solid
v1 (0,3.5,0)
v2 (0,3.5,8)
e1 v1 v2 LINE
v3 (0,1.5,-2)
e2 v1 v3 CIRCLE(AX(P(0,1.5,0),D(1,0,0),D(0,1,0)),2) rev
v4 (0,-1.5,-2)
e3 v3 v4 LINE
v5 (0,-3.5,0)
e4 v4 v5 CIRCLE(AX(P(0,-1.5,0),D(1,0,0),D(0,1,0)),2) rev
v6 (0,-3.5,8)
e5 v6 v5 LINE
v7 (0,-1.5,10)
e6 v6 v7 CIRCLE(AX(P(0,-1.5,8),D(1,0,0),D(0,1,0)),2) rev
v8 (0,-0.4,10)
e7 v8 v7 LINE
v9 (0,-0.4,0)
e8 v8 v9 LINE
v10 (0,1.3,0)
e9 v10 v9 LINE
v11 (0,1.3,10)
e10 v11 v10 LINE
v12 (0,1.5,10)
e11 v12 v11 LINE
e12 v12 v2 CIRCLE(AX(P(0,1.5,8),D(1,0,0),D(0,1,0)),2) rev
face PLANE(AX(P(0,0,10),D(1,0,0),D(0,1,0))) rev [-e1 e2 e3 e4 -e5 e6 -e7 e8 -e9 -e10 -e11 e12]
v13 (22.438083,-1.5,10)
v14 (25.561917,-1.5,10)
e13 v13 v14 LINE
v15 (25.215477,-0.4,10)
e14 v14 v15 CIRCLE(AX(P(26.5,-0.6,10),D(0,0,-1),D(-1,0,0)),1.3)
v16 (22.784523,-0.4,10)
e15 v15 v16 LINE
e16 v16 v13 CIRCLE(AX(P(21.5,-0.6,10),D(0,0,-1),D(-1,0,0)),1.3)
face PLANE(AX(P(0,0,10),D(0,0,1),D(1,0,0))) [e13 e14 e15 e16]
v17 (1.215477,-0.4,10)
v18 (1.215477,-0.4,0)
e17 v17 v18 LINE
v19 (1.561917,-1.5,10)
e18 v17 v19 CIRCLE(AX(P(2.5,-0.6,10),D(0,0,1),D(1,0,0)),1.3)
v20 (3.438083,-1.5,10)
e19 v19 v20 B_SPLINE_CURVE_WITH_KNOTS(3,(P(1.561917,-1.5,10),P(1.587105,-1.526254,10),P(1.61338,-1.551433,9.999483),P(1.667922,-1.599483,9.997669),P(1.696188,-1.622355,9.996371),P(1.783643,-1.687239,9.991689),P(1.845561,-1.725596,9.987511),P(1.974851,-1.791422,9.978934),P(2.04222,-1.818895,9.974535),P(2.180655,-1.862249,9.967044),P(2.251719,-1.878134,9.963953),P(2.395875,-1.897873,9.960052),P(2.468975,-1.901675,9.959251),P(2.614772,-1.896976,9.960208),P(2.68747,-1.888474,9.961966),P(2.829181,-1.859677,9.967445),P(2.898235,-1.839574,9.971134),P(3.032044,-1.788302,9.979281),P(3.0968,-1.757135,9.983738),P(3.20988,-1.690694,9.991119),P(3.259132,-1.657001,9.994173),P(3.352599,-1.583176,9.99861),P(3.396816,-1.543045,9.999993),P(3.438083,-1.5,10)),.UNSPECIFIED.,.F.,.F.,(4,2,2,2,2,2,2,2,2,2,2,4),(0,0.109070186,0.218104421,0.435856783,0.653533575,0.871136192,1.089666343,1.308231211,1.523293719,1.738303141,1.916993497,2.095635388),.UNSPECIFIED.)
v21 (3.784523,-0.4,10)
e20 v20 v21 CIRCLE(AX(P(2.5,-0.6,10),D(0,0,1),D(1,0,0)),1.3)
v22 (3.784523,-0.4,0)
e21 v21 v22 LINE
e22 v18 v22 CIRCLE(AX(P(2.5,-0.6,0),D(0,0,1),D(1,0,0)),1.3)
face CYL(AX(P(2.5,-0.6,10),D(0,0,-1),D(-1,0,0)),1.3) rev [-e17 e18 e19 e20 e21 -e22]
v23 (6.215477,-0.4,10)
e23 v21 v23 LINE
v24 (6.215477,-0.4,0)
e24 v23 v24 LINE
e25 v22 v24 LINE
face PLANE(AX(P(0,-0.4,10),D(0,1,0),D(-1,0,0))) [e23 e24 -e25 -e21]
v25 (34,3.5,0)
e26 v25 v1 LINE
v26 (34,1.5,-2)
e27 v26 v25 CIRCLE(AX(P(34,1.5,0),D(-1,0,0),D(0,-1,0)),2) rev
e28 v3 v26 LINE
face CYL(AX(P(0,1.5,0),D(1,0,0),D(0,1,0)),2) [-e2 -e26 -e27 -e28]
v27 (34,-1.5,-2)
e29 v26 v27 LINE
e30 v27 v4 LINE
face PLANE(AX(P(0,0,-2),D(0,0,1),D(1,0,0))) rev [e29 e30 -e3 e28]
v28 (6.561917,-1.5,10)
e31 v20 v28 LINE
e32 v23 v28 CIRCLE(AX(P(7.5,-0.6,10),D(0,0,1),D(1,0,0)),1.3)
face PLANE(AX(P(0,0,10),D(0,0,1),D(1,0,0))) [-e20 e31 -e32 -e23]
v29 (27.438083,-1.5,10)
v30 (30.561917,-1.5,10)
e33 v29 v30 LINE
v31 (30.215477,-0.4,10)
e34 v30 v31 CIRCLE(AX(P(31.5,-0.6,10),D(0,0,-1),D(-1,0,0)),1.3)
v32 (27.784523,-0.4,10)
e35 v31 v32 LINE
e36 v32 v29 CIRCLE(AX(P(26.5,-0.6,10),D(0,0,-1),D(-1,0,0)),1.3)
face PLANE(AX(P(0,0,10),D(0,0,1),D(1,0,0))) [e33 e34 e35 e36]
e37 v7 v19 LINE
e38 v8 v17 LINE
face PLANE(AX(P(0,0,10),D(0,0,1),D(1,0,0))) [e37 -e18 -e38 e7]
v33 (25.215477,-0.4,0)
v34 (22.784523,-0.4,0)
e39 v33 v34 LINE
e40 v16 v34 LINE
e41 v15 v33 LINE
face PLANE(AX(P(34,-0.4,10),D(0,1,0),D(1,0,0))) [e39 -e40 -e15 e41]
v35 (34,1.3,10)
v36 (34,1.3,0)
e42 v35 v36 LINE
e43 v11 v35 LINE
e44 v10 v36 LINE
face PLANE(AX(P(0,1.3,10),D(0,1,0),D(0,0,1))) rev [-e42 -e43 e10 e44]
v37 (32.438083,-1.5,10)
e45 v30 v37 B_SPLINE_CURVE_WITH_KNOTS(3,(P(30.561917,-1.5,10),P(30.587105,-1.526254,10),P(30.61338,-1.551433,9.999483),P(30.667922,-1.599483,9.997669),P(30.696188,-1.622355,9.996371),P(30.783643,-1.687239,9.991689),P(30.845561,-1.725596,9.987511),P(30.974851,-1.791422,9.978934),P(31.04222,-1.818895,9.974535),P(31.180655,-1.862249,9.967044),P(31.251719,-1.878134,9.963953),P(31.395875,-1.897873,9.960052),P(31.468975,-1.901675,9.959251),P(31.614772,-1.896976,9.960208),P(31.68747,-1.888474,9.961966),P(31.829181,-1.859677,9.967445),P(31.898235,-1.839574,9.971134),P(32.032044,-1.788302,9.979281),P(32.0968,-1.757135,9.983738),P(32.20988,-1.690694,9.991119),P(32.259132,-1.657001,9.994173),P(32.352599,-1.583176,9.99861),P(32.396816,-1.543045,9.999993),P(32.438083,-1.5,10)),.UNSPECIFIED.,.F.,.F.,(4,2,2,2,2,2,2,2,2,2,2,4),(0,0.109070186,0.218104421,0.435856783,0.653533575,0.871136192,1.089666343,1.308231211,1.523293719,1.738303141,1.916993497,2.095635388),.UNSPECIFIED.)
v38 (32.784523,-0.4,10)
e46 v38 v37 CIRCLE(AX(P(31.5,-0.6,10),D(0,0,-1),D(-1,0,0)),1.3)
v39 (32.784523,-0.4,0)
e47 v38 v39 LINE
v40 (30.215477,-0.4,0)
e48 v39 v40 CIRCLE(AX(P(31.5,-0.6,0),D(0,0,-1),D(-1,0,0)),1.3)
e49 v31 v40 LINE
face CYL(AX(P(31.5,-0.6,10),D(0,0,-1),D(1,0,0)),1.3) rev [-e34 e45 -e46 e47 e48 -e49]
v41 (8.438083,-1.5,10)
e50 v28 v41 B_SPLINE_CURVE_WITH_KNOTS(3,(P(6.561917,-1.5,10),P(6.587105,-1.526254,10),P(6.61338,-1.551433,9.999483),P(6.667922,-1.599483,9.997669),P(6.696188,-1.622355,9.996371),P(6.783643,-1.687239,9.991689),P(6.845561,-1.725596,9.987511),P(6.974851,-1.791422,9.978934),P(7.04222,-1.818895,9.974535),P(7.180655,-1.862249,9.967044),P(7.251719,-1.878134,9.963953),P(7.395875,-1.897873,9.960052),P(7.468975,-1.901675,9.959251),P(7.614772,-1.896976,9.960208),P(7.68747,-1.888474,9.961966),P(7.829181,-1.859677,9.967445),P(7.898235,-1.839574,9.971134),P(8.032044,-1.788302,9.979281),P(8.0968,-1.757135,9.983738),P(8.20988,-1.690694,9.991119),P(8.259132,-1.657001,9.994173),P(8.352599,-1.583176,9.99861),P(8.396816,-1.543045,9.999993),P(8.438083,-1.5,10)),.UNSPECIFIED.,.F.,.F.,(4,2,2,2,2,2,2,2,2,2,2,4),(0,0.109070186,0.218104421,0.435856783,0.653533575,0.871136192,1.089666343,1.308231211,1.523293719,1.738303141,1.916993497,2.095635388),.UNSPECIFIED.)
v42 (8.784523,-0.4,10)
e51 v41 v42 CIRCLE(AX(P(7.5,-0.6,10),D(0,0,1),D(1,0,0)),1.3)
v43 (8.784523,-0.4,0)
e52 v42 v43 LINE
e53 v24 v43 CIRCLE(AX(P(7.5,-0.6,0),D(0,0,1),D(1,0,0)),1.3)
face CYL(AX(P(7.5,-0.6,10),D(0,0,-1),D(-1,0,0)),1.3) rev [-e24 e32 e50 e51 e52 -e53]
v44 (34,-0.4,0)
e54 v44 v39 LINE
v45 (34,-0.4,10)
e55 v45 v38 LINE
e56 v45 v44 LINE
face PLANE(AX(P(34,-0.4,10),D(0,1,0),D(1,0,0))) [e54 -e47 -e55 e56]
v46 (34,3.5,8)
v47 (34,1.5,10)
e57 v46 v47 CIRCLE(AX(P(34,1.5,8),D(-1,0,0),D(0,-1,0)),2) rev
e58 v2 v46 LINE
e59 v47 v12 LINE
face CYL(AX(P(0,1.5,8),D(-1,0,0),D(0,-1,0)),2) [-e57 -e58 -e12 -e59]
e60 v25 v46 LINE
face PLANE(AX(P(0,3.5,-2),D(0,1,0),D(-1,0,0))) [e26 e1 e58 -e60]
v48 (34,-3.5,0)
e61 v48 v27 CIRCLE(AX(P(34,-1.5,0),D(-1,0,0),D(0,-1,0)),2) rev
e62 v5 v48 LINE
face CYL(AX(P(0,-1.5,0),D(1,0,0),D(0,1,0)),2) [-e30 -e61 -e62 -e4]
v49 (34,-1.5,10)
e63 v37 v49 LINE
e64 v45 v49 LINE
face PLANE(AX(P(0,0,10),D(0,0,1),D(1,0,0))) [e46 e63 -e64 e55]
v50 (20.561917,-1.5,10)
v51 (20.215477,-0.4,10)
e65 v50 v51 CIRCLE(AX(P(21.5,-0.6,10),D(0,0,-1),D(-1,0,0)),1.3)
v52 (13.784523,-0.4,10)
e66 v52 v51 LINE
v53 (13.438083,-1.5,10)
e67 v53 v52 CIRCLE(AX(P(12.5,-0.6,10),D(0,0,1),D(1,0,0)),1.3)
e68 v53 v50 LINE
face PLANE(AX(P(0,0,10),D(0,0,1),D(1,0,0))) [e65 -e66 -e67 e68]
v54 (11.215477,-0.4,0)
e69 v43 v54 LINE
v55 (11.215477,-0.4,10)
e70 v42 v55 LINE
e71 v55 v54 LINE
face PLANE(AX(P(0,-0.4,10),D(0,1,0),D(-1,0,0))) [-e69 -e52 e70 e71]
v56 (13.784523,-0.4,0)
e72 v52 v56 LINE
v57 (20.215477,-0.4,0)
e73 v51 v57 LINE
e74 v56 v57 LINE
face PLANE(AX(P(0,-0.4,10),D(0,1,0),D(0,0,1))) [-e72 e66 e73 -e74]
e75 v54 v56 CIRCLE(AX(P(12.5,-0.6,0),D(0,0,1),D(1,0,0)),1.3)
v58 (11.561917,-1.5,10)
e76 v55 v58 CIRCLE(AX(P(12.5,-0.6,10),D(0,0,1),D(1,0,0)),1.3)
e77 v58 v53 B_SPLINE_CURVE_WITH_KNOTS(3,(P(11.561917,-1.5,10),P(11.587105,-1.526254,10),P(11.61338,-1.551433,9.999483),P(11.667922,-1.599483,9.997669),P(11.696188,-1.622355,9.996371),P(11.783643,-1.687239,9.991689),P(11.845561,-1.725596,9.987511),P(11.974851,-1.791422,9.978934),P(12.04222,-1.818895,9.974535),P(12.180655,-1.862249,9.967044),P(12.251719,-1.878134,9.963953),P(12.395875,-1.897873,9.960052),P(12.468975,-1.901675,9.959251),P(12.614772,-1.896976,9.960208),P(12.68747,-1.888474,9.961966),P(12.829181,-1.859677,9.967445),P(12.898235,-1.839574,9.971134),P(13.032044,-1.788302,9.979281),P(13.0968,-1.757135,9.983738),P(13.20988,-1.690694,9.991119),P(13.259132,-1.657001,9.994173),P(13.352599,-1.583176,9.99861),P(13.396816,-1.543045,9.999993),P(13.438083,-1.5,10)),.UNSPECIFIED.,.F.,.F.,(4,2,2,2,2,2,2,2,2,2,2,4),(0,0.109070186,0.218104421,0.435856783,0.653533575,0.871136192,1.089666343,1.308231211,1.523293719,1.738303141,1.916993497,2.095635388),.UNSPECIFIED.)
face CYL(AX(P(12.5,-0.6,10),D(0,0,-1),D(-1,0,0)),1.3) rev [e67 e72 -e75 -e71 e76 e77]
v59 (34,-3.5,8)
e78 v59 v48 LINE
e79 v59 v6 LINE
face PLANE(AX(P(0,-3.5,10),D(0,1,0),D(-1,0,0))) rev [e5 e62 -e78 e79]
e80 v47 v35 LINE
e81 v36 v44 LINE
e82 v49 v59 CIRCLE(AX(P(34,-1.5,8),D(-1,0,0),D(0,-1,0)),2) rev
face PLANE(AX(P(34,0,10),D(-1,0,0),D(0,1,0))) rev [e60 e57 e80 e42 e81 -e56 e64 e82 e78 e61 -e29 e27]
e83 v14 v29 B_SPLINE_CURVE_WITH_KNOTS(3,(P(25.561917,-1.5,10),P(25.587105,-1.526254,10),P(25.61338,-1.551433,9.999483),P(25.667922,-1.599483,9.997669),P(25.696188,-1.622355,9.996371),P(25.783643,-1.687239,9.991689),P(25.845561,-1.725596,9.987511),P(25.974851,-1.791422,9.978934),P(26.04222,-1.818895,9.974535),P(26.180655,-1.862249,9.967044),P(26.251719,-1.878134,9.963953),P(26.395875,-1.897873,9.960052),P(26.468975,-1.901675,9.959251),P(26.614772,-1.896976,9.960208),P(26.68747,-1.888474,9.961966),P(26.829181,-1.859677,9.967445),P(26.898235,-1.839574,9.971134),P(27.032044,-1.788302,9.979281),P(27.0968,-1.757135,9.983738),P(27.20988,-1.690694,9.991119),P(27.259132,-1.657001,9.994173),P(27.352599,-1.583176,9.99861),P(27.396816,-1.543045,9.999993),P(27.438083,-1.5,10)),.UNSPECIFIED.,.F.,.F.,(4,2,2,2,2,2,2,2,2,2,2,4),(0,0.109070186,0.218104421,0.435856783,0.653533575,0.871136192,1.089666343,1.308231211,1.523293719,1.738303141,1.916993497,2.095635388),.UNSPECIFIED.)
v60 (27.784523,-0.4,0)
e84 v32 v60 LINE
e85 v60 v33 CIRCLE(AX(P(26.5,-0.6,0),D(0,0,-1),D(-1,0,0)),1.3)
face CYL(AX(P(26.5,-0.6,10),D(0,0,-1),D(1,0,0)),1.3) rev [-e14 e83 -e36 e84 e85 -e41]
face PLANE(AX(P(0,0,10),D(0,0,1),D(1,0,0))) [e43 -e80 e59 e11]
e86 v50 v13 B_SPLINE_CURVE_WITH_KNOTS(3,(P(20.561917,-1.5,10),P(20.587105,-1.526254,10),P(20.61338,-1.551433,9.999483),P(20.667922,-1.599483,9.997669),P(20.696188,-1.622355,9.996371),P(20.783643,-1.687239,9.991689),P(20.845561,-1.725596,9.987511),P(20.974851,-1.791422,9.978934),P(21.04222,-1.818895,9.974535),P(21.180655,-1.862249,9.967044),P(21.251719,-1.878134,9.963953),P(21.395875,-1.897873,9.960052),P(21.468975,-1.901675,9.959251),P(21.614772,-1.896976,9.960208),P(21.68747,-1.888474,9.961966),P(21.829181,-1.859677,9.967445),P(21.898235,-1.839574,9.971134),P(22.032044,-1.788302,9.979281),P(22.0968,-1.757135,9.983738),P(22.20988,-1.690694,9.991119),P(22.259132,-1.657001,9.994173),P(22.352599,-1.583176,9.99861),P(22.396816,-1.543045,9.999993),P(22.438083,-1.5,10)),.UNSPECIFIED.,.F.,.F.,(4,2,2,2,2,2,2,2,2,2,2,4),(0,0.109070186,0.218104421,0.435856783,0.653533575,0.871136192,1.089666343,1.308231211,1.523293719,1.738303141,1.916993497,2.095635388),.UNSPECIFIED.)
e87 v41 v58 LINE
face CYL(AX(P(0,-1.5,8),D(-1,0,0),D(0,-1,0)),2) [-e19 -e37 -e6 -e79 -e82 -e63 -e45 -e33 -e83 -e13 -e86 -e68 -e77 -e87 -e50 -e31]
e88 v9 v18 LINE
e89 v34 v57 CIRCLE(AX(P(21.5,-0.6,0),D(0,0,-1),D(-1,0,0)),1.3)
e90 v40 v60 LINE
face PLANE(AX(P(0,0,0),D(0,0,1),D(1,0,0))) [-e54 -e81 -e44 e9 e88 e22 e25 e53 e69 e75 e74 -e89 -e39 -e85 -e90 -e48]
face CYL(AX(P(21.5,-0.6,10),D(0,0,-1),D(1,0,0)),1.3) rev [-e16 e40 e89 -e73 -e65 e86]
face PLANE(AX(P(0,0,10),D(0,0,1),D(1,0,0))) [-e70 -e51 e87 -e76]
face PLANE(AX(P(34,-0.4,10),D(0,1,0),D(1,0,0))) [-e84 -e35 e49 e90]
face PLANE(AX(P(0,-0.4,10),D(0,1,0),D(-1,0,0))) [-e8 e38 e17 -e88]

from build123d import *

# Parameters (mm, degrees)
SKETCH2_W             = 17
SKETCH2_H             = 2.2
BOSS_EXTRUDE1_DEPTH   = 10
BOSS_EXTRUDE1_2_DEPTH = 10
SKETCH2_4_W           = 17
SKETCH2_4_H           = 7
BOSS_EXTRUDE2_DEPTH   = 2
FILLET2_R             = 2


with BuildPart() as part:
    # Sketch2 → Boss-Extrude1 (new body)
    with BuildSketch(Plane.XY):
        with Locations((8.5, 2.4)):
            Rectangle(SKETCH2_W, SKETCH2_H)
    extrude(amount=BOSS_EXTRUDE1_DEPTH)



with BuildPart() as body_2:
    # Sketch2 → Boss-Extrude1 2 (new body)
    with BuildSketch(Plane.XY):
        with BuildLine():
            Line((1.215476742, -0.4), (0, -0.4))
            Line((0, -0.4), (0, -3.5))
            Line((0, -3.5), (17, -3.5))
            Line((17, -3.5), (17, -0.4))
            Line((17, -0.4), (13.784523258, -0.4))
            ThreePointArc((13.784523258, -0.4), (12.5, -1.9), (11.215476742, -0.4))
            Line((11.215476742, -0.4), (8.784523258, -0.4))
            ThreePointArc((8.784523258, -0.4), (7.5, -1.9), (6.215476742, -0.4))
            Line((6.215476742, -0.4), (3.784523258, -0.4))
            ThreePointArc((3.784523258, -0.4), (2.5, -1.9), (1.215476742, -0.4))
        make_face()
    extrude(amount=BOSS_EXTRUDE1_2_DEPTH)


with BuildPart() as part_1:
    add(part.part)

    add(body_2.part)  # Boss-Extrude2 merges body 2
    # Sketch2<4> → Boss-Extrude2 (add)
    with BuildSketch(Plane.XY):
        with Locations((8.5, 0)):
            Rectangle(SKETCH2_4_W, SKETCH2_4_H)
    extrude(amount=-BOSS_EXTRUDE2_DEPTH)

    # Mirror1: part across plane


with BuildPart() as part_2:
    add(part_1.part)
    add(part_1.part.mirror(Plane(origin=(17, 0, 10), x_dir=(0, 0, 1), z_dir=(-1, 0, 0))))

    # Fillet2
    # the kernel refuses this fillet: 2 mm, written as the material it takes off along each edge
    with BuildSketch(Plane(origin=(-5, -3.5, 10), x_dir=(0, 0, -1), z_dir=(1, 0, 0)), Plane(origin=(-5, 3.5, -2), x_dir=(0, 0, 1), z_dir=(1, 0, 0)), Plane(origin=(-5, -3.5, -2), x_dir=(0, 1, 0), z_dir=(1, 0, 0))) as fillet2_piece_1:
        with BuildLine():
            CenterArc((FILLET2_R, FILLET2_R), FILLET2_R, 180, 90)
            Line((0, FILLET2_R), (0, 0))
            Line((0, 0), (FILLET2_R, 0))
        make_face()
    extrude(amount=44, mode=Mode.SUBTRACT)
    with BuildSketch(Plane(origin=(39, 3.5, 10), x_dir=(0, -1, 0), z_dir=(-1, 0, 0))) as fillet2_piece_2:
        with BuildLine():
            CenterArc((FILLET2_R, -FILLET2_R), FILLET2_R, 90, 90)
            Line((0, -FILLET2_R), (0, 0))
            Line((0, 0), (FILLET2_R, 0))
        make_face()
    extrude(amount=44, mode=Mode.SUBTRACT)


solid = part_2.part
